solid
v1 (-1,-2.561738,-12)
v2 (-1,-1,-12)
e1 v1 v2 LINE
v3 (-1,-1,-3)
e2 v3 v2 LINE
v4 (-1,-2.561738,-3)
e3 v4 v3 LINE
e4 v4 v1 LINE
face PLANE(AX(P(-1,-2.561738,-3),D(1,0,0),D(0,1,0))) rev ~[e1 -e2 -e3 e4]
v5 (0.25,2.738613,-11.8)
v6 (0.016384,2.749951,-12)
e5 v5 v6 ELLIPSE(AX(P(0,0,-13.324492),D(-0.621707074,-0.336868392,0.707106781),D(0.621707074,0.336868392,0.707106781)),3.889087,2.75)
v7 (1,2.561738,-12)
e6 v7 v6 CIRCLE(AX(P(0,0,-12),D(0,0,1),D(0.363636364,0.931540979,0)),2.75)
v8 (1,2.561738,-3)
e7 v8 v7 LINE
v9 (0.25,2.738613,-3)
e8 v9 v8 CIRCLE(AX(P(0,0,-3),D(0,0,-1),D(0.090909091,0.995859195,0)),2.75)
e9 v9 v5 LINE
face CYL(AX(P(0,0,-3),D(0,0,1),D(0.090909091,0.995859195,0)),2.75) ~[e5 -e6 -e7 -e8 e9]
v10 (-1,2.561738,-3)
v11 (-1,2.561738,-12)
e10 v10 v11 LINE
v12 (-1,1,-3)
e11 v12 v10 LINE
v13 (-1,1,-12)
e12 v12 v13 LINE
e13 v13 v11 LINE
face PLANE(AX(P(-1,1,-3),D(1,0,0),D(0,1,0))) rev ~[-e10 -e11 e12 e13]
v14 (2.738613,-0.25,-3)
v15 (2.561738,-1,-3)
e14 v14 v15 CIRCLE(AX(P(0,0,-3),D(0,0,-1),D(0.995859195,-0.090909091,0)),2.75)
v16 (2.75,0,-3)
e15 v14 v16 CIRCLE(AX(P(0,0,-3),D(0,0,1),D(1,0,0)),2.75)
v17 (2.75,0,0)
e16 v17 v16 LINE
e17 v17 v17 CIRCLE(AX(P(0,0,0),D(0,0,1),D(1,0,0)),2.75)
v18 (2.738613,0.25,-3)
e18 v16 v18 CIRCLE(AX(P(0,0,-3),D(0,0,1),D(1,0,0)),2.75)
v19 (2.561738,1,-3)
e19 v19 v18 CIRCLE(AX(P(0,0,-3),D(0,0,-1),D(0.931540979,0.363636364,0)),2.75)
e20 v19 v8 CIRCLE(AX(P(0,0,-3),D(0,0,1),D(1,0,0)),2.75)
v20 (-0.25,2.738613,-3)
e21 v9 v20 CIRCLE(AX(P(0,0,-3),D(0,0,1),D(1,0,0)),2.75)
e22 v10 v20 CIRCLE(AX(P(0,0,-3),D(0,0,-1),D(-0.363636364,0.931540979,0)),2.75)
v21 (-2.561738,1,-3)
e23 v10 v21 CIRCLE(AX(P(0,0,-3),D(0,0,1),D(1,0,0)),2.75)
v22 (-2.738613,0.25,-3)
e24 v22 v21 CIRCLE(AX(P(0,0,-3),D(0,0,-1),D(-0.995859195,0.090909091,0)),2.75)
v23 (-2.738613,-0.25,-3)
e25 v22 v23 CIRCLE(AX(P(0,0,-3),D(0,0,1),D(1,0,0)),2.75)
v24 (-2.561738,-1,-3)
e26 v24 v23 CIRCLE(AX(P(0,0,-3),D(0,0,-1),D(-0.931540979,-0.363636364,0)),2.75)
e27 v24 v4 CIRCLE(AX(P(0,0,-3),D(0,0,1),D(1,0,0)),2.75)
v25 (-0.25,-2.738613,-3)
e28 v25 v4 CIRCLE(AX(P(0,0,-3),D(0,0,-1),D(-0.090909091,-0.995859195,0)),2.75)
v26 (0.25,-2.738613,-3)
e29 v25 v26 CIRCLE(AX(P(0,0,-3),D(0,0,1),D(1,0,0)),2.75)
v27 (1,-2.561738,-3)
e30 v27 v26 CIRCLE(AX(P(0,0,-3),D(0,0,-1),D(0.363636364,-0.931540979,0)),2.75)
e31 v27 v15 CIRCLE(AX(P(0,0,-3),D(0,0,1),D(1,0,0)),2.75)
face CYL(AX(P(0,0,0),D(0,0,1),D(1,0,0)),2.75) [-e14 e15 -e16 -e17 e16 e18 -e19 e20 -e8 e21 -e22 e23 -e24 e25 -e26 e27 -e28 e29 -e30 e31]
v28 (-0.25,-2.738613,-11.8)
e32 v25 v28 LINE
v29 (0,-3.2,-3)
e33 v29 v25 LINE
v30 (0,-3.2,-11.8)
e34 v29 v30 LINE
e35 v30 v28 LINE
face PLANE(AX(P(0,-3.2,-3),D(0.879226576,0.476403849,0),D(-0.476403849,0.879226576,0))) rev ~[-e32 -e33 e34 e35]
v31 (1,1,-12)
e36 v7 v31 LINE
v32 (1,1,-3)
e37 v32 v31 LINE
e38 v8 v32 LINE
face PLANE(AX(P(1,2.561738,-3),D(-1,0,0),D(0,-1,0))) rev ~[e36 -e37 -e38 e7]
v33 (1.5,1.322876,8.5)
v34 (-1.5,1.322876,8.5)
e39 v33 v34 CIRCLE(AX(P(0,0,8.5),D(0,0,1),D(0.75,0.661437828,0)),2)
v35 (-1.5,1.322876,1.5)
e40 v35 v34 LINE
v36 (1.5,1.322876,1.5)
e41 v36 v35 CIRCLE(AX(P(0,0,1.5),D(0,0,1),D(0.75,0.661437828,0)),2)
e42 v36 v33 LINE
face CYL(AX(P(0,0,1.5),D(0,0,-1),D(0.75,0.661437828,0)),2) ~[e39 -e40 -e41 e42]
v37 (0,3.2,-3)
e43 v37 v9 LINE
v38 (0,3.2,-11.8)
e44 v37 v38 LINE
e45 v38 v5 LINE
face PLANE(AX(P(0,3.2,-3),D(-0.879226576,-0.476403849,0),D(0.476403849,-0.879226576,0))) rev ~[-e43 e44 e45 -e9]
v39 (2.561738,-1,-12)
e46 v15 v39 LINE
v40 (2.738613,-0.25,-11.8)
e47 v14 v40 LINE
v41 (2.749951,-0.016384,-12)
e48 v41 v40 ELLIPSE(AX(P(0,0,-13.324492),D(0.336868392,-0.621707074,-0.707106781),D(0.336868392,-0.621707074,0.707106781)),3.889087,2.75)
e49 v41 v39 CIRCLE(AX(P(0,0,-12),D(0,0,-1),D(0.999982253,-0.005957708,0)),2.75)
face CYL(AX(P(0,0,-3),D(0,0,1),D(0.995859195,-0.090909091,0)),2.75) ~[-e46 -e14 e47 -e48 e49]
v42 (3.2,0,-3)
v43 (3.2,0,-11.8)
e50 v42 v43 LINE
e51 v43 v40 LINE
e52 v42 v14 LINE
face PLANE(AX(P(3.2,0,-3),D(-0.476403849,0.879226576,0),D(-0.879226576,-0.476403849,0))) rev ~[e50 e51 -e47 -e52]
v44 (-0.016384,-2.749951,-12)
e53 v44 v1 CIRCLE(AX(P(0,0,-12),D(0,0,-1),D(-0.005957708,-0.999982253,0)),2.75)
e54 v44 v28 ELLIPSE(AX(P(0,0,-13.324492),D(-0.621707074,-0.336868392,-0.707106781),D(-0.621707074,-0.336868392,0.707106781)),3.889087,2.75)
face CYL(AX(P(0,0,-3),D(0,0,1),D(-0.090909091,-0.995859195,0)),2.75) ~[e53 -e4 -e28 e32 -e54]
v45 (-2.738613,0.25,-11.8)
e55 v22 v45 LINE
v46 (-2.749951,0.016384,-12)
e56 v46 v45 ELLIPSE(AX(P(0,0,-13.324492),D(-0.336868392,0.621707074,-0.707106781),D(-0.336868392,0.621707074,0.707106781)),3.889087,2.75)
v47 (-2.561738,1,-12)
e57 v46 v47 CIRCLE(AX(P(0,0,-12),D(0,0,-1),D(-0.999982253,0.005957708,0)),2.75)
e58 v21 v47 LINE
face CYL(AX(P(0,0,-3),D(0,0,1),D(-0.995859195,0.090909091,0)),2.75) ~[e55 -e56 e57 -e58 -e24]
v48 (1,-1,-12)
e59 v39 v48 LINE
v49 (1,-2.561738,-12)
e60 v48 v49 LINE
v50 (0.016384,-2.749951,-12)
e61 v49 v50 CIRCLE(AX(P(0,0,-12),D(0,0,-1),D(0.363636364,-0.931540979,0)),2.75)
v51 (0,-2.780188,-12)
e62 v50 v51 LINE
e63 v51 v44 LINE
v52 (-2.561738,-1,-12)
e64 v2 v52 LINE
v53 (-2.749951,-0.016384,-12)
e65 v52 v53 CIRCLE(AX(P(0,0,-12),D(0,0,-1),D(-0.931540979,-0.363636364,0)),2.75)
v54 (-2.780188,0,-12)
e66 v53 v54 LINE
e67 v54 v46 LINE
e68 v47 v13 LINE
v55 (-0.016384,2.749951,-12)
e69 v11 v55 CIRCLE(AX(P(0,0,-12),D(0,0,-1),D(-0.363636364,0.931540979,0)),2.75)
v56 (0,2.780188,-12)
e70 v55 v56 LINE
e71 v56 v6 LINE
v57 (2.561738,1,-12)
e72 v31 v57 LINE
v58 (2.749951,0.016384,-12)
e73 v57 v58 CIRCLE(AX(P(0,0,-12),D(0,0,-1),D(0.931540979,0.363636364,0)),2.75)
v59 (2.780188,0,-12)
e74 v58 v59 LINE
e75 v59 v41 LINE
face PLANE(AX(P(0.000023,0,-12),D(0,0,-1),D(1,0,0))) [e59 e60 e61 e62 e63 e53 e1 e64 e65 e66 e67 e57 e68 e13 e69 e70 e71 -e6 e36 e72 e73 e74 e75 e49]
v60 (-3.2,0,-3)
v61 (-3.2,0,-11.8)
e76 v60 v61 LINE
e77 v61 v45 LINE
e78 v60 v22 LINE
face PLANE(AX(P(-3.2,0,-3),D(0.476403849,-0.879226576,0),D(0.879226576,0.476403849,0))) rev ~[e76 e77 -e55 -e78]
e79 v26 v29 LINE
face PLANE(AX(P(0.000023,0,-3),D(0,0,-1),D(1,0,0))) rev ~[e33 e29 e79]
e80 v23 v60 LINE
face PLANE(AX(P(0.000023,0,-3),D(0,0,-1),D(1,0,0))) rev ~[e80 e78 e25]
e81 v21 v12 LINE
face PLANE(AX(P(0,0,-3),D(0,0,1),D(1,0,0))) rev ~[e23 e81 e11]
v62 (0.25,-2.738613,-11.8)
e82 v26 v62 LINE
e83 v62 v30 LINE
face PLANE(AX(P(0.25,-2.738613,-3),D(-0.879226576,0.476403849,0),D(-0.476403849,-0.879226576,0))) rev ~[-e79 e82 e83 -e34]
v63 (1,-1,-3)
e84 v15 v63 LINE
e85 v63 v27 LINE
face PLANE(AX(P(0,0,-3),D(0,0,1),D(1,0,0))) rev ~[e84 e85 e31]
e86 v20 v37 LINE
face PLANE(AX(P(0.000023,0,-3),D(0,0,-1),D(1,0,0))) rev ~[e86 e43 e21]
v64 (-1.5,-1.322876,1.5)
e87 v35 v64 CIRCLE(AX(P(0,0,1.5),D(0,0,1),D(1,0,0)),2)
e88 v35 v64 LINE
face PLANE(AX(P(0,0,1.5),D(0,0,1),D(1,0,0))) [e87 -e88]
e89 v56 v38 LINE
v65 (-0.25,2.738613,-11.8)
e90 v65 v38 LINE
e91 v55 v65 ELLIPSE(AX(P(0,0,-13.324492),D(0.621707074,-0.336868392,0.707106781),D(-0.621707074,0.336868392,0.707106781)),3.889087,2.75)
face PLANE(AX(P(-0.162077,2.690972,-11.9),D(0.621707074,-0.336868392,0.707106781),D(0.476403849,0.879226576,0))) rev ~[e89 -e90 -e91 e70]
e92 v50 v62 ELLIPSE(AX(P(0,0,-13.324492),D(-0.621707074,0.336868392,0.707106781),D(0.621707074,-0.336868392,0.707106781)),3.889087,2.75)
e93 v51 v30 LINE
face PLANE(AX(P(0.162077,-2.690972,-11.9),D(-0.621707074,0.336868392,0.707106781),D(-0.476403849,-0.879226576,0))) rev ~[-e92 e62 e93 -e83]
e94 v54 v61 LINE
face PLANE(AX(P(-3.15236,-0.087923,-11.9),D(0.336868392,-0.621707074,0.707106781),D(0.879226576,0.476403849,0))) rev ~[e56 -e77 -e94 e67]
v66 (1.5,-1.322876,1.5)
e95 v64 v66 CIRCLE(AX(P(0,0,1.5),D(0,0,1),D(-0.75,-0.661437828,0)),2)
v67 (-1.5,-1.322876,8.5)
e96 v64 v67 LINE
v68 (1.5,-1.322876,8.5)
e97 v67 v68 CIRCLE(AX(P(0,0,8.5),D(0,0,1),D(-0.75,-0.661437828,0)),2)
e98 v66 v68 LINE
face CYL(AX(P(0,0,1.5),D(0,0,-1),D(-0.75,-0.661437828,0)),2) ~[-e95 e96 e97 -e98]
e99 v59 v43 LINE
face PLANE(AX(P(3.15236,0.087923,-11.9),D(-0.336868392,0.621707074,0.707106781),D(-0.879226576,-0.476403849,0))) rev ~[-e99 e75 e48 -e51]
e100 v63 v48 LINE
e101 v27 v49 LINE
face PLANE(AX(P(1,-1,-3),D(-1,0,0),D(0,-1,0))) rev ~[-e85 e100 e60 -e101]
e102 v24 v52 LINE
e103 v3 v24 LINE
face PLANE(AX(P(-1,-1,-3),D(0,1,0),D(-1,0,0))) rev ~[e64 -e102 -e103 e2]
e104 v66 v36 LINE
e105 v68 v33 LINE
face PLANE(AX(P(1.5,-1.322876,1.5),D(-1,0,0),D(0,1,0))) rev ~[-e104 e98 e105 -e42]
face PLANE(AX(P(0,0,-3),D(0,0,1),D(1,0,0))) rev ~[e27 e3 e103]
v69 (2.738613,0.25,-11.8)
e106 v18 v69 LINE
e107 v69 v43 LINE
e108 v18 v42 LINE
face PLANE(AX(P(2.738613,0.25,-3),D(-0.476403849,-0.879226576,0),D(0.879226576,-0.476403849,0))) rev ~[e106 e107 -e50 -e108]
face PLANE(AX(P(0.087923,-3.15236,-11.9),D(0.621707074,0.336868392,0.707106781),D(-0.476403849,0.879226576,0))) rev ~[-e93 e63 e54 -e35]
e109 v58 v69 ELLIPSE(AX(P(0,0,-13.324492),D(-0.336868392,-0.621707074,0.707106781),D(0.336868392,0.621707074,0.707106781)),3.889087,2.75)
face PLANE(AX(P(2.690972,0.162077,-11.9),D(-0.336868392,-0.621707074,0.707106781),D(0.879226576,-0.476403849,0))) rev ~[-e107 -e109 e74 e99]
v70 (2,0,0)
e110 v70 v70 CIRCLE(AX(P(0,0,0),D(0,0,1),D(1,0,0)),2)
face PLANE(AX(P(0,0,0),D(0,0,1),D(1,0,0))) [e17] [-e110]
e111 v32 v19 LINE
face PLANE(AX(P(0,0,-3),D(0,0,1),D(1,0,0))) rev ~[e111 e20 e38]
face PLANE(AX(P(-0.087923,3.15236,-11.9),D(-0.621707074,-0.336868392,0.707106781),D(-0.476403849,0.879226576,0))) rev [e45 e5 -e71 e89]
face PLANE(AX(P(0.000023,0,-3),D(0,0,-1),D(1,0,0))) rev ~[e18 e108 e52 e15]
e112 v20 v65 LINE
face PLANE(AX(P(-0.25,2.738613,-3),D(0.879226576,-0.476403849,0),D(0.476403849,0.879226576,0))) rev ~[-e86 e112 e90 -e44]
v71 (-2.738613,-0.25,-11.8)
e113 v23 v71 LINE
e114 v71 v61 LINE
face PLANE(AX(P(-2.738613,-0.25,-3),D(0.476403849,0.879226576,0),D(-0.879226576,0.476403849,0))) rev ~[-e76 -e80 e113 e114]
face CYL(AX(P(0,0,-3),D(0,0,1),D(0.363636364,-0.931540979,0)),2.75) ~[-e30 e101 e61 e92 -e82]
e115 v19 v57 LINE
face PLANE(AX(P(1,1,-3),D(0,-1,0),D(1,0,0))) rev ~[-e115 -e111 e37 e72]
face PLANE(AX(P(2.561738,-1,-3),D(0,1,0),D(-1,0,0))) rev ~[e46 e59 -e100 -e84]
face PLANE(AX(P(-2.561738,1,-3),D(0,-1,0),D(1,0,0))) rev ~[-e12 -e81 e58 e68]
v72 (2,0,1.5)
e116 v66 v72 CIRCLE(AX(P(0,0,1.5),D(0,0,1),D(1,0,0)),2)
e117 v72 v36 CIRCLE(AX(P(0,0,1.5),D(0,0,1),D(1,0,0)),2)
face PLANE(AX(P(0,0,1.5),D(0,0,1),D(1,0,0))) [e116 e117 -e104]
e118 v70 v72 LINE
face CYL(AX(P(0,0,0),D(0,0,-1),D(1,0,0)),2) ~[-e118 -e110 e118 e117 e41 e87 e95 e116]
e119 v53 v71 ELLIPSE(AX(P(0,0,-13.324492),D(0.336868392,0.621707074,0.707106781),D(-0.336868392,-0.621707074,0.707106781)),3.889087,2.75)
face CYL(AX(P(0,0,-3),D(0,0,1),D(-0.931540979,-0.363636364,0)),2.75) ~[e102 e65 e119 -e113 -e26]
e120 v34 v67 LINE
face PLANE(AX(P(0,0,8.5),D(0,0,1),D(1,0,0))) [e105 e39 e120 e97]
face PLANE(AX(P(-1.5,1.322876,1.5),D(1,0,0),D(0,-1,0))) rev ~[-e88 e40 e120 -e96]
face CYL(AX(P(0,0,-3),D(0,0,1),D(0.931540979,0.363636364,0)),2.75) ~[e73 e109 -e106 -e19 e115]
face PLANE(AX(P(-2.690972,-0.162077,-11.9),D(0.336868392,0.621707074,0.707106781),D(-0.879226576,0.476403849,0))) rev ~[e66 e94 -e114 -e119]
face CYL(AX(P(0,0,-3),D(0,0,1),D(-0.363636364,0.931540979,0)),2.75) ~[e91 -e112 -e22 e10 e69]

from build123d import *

# Parameters (mm, degrees)
F0_R     = 2.75
F0_R_2   = 2
F1_DEPTH = 3
F2_DEPTH = 1.5
F4_DEPTH = 7
F6_DEPTH = 9
F7_SIZE  = 0.2


# Not quite as in the source:
# - after a boolean that leaves OpenCascade's solid faulty, fix() repairs it


with BuildPart() as f1:
    # F0 (on Top) → F1 (new body)
    with BuildSketch(Plane.XY):
        Circle(F0_R)
        Circle(F0_R_2, mode=Mode.SUBTRACT)
        Circle(F0_R_2)
    extrude(amount=-F1_DEPTH)

    # F0 (on Top) → F2 (join)
    with BuildSketch(Plane.XY):
        Circle(F0_R_2)
    extrude(amount=F2_DEPTH)

    # F3 (on face) → F4 (join)
    with BuildSketch(Plane.XY.offset(1.5)):
        with BuildLine():
            ThreePointArc((1.5, 1.3228756555), (0, 2), (-1.5, 1.3228756555))
            Line((-1.5, 1.3228756555), (-1.5, -1.3228756555))
            ThreePointArc((-1.5, -1.3228756555), (0, -2), (1.5, -1.3228756555))
            Line((1.5, -1.3228756555), (1.5, 1.3228756555))
        make_face()
    extrude(amount=F4_DEPTH)

    # F5 (on face) → F6 (join)
    with BuildSketch(Plane(origin=(0, 0, -3), x_dir=(1, 0, 0), z_dir=(0, 0, -1))):
        with BuildLine():
            ThreePointArc((0.25, -2.7386127875), (0.63122595, -2.676575013), (1, -2.5617376915))
            Line((1, -2.5617376915), (1, -1))
            Line((1, -1), (2.5617376915, -1))
            ThreePointArc((2.5617376915, -1), (2.676575013, -0.63122595), (2.7386127875, -0.25))
            ThreePointArc((2.7386127875, -0.25), (2.7471517218, -0.1251296014), (2.75, 0))
            ThreePointArc((2.75, 0), (2.7471517218, 0.1251296014), (2.7386127875, 0.25))
            ThreePointArc((2.7386127875, 0.25), (2.676575013, 0.63122595), (2.5617376915, 1))
            Line((2.5617376915, 1), (1, 1))
            Line((1, 1), (1, 2.5617376915))
            ThreePointArc((1, 2.5617376915), (0.63122595, 2.676575013), (0.25, 2.7386127875))
            ThreePointArc((0.25, 2.7386127875), (0, 2.75), (-0.25, 2.7386127875))
            ThreePointArc((-0.25, 2.7386127875), (-0.63122595, 2.676575013), (-1, 2.5617376915))
            Line((-1, 2.5617376915), (-1, 1))
            Line((-1, 1), (-2.5617376915, 1))
            ThreePointArc((-2.5617376915, 1), (-2.676575013, 0.63122595), (-2.7386127875, 0.25))
            ThreePointArc((-2.7386127875, 0.25), (-2.75, 0), (-2.7386127875, -0.25))
            ThreePointArc((-2.7386127875, -0.25), (-2.676575013, -0.63122595), (-2.5617376915, -1))
            Line((-2.5617376915, -1), (-1, -1))
            Line((-1, -1), (-1, -2.5617376915))
            ThreePointArc((-1, -2.5617376915), (-0.63122595, -2.676575013), (-0.25, -2.7386127875))
            ThreePointArc((-0.25, -2.7386127875), (0, -2.75), (0.25, -2.7386127875))
        make_face()
        with BuildLine():
            ThreePointArc((2.75, 0), (2.7471517218, -0.1251296014), (2.7386127875, -0.25))
            Line((2.7386127875, -0.25), (3.2, 0))
            Line((3.2, 0), (2.7386127875, 0.25))
            ThreePointArc((2.7386127875, 0.25), (2.7471517218, 0.1251296014), (2.75, 0))
        make_face()
        with BuildLine():
            Line((0, -3.2), (0.25, -2.7386127875))
            ThreePointArc((0.25, -2.7386127875), (0, -2.75), (-0.25, -2.7386127875))
            Line((-0.25, -2.7386127875), (0, -3.2))
        make_face()
        with BuildLine():
            Line((-3.2, 0), (-2.7386127875, -0.25))
            ThreePointArc((-2.7386127875, -0.25), (-2.75, 0), (-2.7386127875, 0.25))
            Line((-2.7386127875, 0.25), (-3.2, 0))
        make_face()
        with BuildLine():
            ThreePointArc((-0.25, 2.7386127875), (0, 2.75), (0.25, 2.7386127875))
            Line((0.25, 2.7386127875), (0, 3.2))
            Line((0, 3.2), (-0.25, 2.7386127875))
        make_face()
    extrude(amount=F6_DEPTH)

    add(f1.part.fix(), mode=Mode.REPLACE)

    # F7
    f7_edges = [f1.edges().sort_by_distance(p)[0] for p in [
        (-0.125, 2.969306, -12),
        (0.125, 2.969306, -12),
        (-2.969306, 0.125, -12),
        (-2.969306, -0.125, -12),
        (0.125, -2.969306, -12),
        (-0.125, -2.969306, -12),
        (2.969306, -0.125, -12),
        (2.969306, 0.125, -12),
    ]]
    chamfer(f7_edges, length=F7_SIZE)


solid = f1.part
